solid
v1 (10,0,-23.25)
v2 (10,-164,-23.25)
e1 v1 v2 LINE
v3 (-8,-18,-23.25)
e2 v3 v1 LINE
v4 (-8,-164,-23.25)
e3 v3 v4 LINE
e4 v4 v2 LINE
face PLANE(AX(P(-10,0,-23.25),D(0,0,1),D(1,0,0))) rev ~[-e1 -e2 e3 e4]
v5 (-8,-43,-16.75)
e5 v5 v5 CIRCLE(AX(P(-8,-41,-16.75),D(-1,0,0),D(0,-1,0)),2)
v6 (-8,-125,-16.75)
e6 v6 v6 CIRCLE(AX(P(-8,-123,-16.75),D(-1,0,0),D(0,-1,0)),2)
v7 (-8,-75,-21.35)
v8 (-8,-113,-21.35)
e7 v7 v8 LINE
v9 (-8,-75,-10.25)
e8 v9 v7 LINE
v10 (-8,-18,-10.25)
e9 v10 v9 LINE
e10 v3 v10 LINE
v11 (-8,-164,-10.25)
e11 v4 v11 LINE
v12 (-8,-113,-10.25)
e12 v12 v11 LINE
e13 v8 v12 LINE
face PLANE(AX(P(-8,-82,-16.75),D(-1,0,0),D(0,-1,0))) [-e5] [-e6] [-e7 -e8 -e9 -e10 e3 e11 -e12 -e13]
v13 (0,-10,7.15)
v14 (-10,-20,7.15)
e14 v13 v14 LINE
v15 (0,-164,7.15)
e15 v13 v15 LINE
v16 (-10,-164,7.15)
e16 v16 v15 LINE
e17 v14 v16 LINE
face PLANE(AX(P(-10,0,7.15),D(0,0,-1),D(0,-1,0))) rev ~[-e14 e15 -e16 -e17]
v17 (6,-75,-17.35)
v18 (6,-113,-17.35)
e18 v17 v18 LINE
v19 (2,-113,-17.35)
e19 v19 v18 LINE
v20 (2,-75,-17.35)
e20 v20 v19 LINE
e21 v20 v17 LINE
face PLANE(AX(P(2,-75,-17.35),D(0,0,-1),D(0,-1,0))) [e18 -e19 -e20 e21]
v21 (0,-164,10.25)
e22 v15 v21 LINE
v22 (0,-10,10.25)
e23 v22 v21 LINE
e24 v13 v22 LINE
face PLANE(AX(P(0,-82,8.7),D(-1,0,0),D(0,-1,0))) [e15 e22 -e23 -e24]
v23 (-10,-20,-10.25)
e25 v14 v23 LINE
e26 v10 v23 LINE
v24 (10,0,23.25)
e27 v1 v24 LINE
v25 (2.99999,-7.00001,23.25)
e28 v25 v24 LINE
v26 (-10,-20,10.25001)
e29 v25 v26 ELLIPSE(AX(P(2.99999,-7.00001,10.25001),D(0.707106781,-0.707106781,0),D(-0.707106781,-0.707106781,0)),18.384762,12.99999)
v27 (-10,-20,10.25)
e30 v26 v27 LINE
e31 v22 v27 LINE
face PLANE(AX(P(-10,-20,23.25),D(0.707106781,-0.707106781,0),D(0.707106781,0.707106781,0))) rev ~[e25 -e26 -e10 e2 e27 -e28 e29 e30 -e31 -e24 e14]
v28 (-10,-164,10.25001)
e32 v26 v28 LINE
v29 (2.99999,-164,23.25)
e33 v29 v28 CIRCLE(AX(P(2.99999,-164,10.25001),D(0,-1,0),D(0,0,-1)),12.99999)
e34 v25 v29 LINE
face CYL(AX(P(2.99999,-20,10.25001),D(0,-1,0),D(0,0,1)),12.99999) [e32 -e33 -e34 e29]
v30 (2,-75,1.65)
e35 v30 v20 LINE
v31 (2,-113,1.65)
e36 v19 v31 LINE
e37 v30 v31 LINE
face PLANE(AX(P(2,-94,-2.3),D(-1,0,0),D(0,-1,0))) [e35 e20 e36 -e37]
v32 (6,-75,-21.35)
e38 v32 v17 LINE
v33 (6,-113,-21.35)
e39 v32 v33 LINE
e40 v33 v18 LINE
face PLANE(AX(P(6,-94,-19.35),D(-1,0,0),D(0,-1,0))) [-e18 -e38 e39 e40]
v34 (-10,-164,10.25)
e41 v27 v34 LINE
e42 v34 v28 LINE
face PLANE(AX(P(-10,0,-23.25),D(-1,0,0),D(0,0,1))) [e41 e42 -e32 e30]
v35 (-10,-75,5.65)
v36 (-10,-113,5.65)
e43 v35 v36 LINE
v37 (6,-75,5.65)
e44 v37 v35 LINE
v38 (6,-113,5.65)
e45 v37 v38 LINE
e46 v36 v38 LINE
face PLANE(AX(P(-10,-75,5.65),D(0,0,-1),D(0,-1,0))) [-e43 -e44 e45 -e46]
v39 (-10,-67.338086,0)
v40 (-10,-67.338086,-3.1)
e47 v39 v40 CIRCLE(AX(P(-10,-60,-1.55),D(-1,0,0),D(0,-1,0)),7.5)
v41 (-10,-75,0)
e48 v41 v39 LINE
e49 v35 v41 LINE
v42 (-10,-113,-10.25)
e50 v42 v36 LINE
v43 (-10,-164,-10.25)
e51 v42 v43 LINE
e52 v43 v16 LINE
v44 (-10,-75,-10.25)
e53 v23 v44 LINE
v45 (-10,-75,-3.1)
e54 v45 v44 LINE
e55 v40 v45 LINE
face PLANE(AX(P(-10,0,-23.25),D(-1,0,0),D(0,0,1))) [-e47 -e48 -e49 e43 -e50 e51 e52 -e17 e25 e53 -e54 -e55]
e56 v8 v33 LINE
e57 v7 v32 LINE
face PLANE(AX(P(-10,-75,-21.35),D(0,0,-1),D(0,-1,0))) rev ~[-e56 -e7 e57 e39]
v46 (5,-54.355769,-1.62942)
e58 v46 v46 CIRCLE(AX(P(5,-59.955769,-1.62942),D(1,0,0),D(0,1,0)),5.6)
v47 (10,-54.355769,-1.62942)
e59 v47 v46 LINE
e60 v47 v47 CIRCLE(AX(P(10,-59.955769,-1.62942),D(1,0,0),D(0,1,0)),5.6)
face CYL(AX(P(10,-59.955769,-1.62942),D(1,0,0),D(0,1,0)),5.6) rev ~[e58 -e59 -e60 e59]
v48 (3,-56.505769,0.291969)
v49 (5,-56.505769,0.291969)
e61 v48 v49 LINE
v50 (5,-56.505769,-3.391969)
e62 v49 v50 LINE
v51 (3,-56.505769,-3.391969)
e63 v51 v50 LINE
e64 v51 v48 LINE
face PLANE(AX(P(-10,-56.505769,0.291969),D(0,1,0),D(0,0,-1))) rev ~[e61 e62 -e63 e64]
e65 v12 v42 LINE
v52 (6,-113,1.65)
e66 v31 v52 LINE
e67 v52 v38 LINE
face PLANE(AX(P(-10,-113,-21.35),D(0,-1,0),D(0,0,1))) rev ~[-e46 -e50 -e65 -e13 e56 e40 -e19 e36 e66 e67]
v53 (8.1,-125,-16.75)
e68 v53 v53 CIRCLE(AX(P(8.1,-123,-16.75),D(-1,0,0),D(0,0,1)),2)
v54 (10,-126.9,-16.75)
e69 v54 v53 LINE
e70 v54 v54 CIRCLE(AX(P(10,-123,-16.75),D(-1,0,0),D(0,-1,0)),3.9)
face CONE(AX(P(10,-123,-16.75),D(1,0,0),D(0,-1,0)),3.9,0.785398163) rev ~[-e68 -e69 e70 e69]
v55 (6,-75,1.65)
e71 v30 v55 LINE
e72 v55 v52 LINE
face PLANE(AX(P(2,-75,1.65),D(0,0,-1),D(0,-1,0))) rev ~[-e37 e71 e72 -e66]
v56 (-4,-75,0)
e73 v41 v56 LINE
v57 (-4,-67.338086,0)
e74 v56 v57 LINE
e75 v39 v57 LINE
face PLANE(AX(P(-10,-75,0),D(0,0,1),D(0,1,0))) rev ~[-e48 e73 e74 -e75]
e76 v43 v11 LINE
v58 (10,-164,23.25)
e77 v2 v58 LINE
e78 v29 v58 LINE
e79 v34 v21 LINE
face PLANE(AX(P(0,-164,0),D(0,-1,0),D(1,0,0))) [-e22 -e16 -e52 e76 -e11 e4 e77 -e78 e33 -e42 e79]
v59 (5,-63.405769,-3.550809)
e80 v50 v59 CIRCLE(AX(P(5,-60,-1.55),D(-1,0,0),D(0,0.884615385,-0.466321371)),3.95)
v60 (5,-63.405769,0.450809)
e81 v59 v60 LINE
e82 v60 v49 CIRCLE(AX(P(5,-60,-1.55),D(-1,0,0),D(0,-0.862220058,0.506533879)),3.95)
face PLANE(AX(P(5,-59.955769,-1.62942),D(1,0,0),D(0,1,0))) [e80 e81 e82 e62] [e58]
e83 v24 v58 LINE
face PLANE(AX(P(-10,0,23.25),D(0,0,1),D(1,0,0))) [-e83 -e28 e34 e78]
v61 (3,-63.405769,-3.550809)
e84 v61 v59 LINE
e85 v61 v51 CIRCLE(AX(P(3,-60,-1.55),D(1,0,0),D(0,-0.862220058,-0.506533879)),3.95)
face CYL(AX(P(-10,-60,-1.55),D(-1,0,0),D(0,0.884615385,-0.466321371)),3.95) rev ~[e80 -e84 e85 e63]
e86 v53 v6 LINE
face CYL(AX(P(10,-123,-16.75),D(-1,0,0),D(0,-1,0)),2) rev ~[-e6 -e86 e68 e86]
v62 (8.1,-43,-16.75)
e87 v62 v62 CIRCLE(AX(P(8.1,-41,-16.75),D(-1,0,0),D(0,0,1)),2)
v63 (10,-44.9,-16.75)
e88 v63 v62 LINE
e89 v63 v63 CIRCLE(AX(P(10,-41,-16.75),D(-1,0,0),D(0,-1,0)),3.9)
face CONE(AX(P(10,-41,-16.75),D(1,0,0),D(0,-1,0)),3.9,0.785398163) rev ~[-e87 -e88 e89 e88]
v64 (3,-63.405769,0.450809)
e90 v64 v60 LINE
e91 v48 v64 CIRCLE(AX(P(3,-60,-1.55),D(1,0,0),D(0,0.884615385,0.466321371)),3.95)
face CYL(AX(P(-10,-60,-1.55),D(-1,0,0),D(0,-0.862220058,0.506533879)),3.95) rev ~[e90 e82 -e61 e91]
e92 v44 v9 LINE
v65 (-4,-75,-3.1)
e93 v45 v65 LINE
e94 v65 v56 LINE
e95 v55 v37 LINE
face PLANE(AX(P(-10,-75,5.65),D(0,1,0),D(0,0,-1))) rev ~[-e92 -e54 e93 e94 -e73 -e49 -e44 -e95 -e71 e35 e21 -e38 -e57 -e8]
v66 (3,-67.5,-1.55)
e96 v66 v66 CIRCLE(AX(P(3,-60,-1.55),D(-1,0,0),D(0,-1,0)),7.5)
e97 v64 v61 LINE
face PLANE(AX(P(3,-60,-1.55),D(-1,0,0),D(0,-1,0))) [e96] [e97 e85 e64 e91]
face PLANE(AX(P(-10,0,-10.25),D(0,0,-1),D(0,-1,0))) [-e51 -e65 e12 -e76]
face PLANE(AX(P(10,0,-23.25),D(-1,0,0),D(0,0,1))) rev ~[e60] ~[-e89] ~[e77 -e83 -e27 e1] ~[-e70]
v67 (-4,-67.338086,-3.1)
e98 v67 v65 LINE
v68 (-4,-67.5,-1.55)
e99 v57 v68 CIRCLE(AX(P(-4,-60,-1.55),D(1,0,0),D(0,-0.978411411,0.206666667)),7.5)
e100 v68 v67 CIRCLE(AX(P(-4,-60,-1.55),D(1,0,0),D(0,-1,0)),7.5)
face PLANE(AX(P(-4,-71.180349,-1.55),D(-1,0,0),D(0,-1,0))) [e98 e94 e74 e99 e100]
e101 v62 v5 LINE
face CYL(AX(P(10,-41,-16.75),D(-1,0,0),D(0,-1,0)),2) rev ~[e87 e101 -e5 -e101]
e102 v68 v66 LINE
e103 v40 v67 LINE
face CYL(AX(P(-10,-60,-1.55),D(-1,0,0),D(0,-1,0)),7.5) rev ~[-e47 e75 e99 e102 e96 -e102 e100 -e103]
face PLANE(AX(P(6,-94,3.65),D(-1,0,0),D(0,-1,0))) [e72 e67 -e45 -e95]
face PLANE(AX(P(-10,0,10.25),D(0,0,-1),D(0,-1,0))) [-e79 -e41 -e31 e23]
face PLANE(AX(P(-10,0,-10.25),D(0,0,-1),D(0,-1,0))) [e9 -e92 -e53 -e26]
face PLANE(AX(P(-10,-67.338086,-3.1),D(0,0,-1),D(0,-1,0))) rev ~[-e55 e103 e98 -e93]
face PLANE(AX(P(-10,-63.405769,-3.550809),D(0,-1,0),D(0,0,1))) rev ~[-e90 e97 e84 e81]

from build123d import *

# Parameters (mm, degrees)
F0_W            = 20
F0_H            = 46.5
F1_DEPTH        = 164
F2_W            = 164
F2_H            = 3.1
F3_DEPTH        = 10
F4_W            = 164
F4_H            = 13
F5_DEPTH        = 2
F7_DEPTH        = 46.5
F8_R            = 12.99999
F10_D           = 4
F10_DEPTH       = 20
F10_CSINK_D     = 7.8
F10_CSINK_ANGLE = 90
F10_TIP         = 1.2017212381
F12_DEPTH       = 20
F13_R           = 7.5
F14_DEPTH       = 13
F15_R           = 5.6
F16_DEPTH       = 5
F17_W           = 38
F17_H           = 15.9
F17_H_2         = 11.1
F18_DEPTH       = 12
F20_DEPTH       = 6
F21_W           = 38
F21_H           = 4
F22_DEPTH       = 4
F23_W           = 38
F23_H           = 4
F24_DEPTH       = 4


# Not quite as in the source:
# - a fillet or chamfer is up to 0.001 mm smaller than in the source, because OpenCascade refuses the exact size


with BuildPart() as f1:
    # F0 (on Front) → F1 (new body)
    with BuildSketch(Plane.XZ):
        Rectangle(F0_W, F0_H)
    extrude(amount=F1_DEPTH)

    # F2 (on face) → F3 (cut)
    with BuildSketch(Plane(origin=(-10, 0, 0), x_dir=(0, -1, 0), z_dir=(-1, 0, 0))):
        with Locations((82, 8.7)):
            Rectangle(F2_W, F2_H)
    extrude(amount=-F3_DEPTH, mode=Mode.SUBTRACT)

    # F4 (on face) → F5 (cut)
    with BuildSketch(Plane(origin=(-10, 0, 0), x_dir=(0, -1, 0), z_dir=(-1, 0, 0))):
        with Locations((82, -16.75)):
            Rectangle(F4_W, F4_H)
    extrude(amount=-F5_DEPTH, mode=Mode.SUBTRACT)

    # F6 (on face) → F7 (cut, through all)
    with BuildSketch(Plane.XY.offset(23.25)):
        Polygon((-10, 0), (-10, -20), (10, 0), align=None)
    extrude(amount=-F7_DEPTH, mode=Mode.SUBTRACT)

    # F8 (radius 13 in the source; OpenCascade refuses exactly that, so slightly less here)
    f8_edges = [f1.edges().sort_by_distance(p)[0] for p in [
        (-10, -92, 23.25),
    ]]
    fillet(f8_edges, radius=F8_R)

    # F10
    with Locations(Plane.YZ.offset(10)):
        with Locations((-123, -16.75), (-41, -16.75)):
            CounterSinkHole(F10_D / 2, F10_CSINK_D / 2, depth=F10_DEPTH, counter_sink_angle=F10_CSINK_ANGLE)
            with Locations((0, 0, -(F10_DEPTH + F10_TIP / 2))):  # 118° drill point
                Cone(0, F10_D / 2, F10_TIP, mode=Mode.SUBTRACT)

    # F11 (on face) → F12 (cut, through all)
    with BuildSketch(Plane(origin=(-10, 0, 0), x_dir=(0, -1, 0), z_dir=(-1, 0, 0))):
        with BuildLine():
            Line((63.4057692308, -3.5508088231), (63.4057692308, 0.4508088231))
            ThreePointArc((63.4057692308, 0.4508088231), (59.9090942784, 2.3989538045), (56.5057692308, 0.2919694165))
            Line((56.5057692308, 0.2919694165), (56.5057692308, -3.3919694165))
            ThreePointArc((56.5057692308, -3.3919694165), (59.9090942784, -5.4989538045), (63.4057692308, -3.5508088231))
        make_face()
    extrude(amount=-F12_DEPTH, mode=Mode.SUBTRACT)

    # F13 (on face) → F14 (cut)
    with BuildSketch(Plane(origin=(-10, 0, 0), x_dir=(0, -1, 0), z_dir=(-1, 0, 0))):
        with Locations((60, -1.55)):
            Circle(F13_R)
        with BuildLine():
            Line((63.4057692308, 0.4508088231), (63.4057692308, -3.5508088231))
            ThreePointArc((63.4057692308, -3.5508088231), (59.9090942784, -5.4989538045), (56.5057692308, -3.3919694165))
            Line((56.5057692308, -3.3919694165), (56.5057692308, 0.2919694165))
            ThreePointArc((56.5057692308, 0.2919694165), (59.9090942784, 2.3989538045), (63.4057692308, 0.4508088231))
        make_face(mode=Mode.SUBTRACT)
    extrude(amount=-F14_DEPTH, mode=Mode.SUBTRACT)

    # F15 (on face) → F16 (cut)
    with BuildSketch(Plane.YZ.offset(10)):
        with Locations((-59.9557692308, -1.6294197033)):
            Circle(F15_R)
        with BuildLine():
            ThreePointArc((-56.5057692308, -3.3919694165), (-59.9090942784, -5.4989538045), (-63.4057692308, -3.5508088231))
            Line((-63.4057692308, -3.5508088231), (-63.4057692308, 0.4508088231))
            ThreePointArc((-63.4057692308, 0.4508088231), (-59.9090942784, 2.3989538045), (-56.5057692308, 0.2919694165))
            Line((-56.5057692308, 0.2919694165), (-56.5057692308, -3.3919694165))
        make_face(mode=Mode.SUBTRACT)
    extrude(amount=-F16_DEPTH, mode=Mode.SUBTRACT)

    # F17 (on face) → F18 (cut)
    with BuildSketch(Plane(origin=(-10, 0, 0), x_dir=(0, -1, 0), z_dir=(-1, 0, 0))):
        with Locations((94, -2.3)):
            Rectangle(F17_W, F17_H)
        with Locations((94, -15.8)):
            Rectangle(F17_W, F17_H_2)
    extrude(amount=-F18_DEPTH, mode=Mode.SUBTRACT)

    # F19 (on face) → F20 (cut)
    with BuildSketch(Plane(origin=(-10, 0, 0), x_dir=(0, -1, 0), z_dir=(-1, 0, 0))):
        with BuildLine():
            Line((75, -3.1), (75, 0))
            Line((75, 0), (67.3380855814, 0))
            ThreePointArc((67.3380855814, 0), (67.4594115673, -0.7707830407), (67.5, -1.55))
            ThreePointArc((67.5, -1.55), (67.4594115673, -2.3292169593), (67.3380855814, -3.1))
            Line((67.3380855814, -3.1), (75, -3.1))
        make_face()
    extrude(amount=-F20_DEPTH, mode=Mode.SUBTRACT)

    # F21 (on face) → F22 (cut)
    with BuildSketch(Plane(origin=(2, 0, 0), x_dir=(0, -1, 0), z_dir=(-1, 0, 0))):
        with Locations((94, 3.65)):
            Rectangle(F21_W, F21_H)
    extrude(amount=-F22_DEPTH, mode=Mode.SUBTRACT)

    # F23 (on face) → F24 (cut)
    with BuildSketch(Plane(origin=(2, 0, 0), x_dir=(0, -1, 0), z_dir=(-1, 0, 0))):
        with Locations((94, -19.35)):
            Rectangle(F23_W, F23_H)
    extrude(amount=-F24_DEPTH, mode=Mode.SUBTRACT)


solid = f1.part
